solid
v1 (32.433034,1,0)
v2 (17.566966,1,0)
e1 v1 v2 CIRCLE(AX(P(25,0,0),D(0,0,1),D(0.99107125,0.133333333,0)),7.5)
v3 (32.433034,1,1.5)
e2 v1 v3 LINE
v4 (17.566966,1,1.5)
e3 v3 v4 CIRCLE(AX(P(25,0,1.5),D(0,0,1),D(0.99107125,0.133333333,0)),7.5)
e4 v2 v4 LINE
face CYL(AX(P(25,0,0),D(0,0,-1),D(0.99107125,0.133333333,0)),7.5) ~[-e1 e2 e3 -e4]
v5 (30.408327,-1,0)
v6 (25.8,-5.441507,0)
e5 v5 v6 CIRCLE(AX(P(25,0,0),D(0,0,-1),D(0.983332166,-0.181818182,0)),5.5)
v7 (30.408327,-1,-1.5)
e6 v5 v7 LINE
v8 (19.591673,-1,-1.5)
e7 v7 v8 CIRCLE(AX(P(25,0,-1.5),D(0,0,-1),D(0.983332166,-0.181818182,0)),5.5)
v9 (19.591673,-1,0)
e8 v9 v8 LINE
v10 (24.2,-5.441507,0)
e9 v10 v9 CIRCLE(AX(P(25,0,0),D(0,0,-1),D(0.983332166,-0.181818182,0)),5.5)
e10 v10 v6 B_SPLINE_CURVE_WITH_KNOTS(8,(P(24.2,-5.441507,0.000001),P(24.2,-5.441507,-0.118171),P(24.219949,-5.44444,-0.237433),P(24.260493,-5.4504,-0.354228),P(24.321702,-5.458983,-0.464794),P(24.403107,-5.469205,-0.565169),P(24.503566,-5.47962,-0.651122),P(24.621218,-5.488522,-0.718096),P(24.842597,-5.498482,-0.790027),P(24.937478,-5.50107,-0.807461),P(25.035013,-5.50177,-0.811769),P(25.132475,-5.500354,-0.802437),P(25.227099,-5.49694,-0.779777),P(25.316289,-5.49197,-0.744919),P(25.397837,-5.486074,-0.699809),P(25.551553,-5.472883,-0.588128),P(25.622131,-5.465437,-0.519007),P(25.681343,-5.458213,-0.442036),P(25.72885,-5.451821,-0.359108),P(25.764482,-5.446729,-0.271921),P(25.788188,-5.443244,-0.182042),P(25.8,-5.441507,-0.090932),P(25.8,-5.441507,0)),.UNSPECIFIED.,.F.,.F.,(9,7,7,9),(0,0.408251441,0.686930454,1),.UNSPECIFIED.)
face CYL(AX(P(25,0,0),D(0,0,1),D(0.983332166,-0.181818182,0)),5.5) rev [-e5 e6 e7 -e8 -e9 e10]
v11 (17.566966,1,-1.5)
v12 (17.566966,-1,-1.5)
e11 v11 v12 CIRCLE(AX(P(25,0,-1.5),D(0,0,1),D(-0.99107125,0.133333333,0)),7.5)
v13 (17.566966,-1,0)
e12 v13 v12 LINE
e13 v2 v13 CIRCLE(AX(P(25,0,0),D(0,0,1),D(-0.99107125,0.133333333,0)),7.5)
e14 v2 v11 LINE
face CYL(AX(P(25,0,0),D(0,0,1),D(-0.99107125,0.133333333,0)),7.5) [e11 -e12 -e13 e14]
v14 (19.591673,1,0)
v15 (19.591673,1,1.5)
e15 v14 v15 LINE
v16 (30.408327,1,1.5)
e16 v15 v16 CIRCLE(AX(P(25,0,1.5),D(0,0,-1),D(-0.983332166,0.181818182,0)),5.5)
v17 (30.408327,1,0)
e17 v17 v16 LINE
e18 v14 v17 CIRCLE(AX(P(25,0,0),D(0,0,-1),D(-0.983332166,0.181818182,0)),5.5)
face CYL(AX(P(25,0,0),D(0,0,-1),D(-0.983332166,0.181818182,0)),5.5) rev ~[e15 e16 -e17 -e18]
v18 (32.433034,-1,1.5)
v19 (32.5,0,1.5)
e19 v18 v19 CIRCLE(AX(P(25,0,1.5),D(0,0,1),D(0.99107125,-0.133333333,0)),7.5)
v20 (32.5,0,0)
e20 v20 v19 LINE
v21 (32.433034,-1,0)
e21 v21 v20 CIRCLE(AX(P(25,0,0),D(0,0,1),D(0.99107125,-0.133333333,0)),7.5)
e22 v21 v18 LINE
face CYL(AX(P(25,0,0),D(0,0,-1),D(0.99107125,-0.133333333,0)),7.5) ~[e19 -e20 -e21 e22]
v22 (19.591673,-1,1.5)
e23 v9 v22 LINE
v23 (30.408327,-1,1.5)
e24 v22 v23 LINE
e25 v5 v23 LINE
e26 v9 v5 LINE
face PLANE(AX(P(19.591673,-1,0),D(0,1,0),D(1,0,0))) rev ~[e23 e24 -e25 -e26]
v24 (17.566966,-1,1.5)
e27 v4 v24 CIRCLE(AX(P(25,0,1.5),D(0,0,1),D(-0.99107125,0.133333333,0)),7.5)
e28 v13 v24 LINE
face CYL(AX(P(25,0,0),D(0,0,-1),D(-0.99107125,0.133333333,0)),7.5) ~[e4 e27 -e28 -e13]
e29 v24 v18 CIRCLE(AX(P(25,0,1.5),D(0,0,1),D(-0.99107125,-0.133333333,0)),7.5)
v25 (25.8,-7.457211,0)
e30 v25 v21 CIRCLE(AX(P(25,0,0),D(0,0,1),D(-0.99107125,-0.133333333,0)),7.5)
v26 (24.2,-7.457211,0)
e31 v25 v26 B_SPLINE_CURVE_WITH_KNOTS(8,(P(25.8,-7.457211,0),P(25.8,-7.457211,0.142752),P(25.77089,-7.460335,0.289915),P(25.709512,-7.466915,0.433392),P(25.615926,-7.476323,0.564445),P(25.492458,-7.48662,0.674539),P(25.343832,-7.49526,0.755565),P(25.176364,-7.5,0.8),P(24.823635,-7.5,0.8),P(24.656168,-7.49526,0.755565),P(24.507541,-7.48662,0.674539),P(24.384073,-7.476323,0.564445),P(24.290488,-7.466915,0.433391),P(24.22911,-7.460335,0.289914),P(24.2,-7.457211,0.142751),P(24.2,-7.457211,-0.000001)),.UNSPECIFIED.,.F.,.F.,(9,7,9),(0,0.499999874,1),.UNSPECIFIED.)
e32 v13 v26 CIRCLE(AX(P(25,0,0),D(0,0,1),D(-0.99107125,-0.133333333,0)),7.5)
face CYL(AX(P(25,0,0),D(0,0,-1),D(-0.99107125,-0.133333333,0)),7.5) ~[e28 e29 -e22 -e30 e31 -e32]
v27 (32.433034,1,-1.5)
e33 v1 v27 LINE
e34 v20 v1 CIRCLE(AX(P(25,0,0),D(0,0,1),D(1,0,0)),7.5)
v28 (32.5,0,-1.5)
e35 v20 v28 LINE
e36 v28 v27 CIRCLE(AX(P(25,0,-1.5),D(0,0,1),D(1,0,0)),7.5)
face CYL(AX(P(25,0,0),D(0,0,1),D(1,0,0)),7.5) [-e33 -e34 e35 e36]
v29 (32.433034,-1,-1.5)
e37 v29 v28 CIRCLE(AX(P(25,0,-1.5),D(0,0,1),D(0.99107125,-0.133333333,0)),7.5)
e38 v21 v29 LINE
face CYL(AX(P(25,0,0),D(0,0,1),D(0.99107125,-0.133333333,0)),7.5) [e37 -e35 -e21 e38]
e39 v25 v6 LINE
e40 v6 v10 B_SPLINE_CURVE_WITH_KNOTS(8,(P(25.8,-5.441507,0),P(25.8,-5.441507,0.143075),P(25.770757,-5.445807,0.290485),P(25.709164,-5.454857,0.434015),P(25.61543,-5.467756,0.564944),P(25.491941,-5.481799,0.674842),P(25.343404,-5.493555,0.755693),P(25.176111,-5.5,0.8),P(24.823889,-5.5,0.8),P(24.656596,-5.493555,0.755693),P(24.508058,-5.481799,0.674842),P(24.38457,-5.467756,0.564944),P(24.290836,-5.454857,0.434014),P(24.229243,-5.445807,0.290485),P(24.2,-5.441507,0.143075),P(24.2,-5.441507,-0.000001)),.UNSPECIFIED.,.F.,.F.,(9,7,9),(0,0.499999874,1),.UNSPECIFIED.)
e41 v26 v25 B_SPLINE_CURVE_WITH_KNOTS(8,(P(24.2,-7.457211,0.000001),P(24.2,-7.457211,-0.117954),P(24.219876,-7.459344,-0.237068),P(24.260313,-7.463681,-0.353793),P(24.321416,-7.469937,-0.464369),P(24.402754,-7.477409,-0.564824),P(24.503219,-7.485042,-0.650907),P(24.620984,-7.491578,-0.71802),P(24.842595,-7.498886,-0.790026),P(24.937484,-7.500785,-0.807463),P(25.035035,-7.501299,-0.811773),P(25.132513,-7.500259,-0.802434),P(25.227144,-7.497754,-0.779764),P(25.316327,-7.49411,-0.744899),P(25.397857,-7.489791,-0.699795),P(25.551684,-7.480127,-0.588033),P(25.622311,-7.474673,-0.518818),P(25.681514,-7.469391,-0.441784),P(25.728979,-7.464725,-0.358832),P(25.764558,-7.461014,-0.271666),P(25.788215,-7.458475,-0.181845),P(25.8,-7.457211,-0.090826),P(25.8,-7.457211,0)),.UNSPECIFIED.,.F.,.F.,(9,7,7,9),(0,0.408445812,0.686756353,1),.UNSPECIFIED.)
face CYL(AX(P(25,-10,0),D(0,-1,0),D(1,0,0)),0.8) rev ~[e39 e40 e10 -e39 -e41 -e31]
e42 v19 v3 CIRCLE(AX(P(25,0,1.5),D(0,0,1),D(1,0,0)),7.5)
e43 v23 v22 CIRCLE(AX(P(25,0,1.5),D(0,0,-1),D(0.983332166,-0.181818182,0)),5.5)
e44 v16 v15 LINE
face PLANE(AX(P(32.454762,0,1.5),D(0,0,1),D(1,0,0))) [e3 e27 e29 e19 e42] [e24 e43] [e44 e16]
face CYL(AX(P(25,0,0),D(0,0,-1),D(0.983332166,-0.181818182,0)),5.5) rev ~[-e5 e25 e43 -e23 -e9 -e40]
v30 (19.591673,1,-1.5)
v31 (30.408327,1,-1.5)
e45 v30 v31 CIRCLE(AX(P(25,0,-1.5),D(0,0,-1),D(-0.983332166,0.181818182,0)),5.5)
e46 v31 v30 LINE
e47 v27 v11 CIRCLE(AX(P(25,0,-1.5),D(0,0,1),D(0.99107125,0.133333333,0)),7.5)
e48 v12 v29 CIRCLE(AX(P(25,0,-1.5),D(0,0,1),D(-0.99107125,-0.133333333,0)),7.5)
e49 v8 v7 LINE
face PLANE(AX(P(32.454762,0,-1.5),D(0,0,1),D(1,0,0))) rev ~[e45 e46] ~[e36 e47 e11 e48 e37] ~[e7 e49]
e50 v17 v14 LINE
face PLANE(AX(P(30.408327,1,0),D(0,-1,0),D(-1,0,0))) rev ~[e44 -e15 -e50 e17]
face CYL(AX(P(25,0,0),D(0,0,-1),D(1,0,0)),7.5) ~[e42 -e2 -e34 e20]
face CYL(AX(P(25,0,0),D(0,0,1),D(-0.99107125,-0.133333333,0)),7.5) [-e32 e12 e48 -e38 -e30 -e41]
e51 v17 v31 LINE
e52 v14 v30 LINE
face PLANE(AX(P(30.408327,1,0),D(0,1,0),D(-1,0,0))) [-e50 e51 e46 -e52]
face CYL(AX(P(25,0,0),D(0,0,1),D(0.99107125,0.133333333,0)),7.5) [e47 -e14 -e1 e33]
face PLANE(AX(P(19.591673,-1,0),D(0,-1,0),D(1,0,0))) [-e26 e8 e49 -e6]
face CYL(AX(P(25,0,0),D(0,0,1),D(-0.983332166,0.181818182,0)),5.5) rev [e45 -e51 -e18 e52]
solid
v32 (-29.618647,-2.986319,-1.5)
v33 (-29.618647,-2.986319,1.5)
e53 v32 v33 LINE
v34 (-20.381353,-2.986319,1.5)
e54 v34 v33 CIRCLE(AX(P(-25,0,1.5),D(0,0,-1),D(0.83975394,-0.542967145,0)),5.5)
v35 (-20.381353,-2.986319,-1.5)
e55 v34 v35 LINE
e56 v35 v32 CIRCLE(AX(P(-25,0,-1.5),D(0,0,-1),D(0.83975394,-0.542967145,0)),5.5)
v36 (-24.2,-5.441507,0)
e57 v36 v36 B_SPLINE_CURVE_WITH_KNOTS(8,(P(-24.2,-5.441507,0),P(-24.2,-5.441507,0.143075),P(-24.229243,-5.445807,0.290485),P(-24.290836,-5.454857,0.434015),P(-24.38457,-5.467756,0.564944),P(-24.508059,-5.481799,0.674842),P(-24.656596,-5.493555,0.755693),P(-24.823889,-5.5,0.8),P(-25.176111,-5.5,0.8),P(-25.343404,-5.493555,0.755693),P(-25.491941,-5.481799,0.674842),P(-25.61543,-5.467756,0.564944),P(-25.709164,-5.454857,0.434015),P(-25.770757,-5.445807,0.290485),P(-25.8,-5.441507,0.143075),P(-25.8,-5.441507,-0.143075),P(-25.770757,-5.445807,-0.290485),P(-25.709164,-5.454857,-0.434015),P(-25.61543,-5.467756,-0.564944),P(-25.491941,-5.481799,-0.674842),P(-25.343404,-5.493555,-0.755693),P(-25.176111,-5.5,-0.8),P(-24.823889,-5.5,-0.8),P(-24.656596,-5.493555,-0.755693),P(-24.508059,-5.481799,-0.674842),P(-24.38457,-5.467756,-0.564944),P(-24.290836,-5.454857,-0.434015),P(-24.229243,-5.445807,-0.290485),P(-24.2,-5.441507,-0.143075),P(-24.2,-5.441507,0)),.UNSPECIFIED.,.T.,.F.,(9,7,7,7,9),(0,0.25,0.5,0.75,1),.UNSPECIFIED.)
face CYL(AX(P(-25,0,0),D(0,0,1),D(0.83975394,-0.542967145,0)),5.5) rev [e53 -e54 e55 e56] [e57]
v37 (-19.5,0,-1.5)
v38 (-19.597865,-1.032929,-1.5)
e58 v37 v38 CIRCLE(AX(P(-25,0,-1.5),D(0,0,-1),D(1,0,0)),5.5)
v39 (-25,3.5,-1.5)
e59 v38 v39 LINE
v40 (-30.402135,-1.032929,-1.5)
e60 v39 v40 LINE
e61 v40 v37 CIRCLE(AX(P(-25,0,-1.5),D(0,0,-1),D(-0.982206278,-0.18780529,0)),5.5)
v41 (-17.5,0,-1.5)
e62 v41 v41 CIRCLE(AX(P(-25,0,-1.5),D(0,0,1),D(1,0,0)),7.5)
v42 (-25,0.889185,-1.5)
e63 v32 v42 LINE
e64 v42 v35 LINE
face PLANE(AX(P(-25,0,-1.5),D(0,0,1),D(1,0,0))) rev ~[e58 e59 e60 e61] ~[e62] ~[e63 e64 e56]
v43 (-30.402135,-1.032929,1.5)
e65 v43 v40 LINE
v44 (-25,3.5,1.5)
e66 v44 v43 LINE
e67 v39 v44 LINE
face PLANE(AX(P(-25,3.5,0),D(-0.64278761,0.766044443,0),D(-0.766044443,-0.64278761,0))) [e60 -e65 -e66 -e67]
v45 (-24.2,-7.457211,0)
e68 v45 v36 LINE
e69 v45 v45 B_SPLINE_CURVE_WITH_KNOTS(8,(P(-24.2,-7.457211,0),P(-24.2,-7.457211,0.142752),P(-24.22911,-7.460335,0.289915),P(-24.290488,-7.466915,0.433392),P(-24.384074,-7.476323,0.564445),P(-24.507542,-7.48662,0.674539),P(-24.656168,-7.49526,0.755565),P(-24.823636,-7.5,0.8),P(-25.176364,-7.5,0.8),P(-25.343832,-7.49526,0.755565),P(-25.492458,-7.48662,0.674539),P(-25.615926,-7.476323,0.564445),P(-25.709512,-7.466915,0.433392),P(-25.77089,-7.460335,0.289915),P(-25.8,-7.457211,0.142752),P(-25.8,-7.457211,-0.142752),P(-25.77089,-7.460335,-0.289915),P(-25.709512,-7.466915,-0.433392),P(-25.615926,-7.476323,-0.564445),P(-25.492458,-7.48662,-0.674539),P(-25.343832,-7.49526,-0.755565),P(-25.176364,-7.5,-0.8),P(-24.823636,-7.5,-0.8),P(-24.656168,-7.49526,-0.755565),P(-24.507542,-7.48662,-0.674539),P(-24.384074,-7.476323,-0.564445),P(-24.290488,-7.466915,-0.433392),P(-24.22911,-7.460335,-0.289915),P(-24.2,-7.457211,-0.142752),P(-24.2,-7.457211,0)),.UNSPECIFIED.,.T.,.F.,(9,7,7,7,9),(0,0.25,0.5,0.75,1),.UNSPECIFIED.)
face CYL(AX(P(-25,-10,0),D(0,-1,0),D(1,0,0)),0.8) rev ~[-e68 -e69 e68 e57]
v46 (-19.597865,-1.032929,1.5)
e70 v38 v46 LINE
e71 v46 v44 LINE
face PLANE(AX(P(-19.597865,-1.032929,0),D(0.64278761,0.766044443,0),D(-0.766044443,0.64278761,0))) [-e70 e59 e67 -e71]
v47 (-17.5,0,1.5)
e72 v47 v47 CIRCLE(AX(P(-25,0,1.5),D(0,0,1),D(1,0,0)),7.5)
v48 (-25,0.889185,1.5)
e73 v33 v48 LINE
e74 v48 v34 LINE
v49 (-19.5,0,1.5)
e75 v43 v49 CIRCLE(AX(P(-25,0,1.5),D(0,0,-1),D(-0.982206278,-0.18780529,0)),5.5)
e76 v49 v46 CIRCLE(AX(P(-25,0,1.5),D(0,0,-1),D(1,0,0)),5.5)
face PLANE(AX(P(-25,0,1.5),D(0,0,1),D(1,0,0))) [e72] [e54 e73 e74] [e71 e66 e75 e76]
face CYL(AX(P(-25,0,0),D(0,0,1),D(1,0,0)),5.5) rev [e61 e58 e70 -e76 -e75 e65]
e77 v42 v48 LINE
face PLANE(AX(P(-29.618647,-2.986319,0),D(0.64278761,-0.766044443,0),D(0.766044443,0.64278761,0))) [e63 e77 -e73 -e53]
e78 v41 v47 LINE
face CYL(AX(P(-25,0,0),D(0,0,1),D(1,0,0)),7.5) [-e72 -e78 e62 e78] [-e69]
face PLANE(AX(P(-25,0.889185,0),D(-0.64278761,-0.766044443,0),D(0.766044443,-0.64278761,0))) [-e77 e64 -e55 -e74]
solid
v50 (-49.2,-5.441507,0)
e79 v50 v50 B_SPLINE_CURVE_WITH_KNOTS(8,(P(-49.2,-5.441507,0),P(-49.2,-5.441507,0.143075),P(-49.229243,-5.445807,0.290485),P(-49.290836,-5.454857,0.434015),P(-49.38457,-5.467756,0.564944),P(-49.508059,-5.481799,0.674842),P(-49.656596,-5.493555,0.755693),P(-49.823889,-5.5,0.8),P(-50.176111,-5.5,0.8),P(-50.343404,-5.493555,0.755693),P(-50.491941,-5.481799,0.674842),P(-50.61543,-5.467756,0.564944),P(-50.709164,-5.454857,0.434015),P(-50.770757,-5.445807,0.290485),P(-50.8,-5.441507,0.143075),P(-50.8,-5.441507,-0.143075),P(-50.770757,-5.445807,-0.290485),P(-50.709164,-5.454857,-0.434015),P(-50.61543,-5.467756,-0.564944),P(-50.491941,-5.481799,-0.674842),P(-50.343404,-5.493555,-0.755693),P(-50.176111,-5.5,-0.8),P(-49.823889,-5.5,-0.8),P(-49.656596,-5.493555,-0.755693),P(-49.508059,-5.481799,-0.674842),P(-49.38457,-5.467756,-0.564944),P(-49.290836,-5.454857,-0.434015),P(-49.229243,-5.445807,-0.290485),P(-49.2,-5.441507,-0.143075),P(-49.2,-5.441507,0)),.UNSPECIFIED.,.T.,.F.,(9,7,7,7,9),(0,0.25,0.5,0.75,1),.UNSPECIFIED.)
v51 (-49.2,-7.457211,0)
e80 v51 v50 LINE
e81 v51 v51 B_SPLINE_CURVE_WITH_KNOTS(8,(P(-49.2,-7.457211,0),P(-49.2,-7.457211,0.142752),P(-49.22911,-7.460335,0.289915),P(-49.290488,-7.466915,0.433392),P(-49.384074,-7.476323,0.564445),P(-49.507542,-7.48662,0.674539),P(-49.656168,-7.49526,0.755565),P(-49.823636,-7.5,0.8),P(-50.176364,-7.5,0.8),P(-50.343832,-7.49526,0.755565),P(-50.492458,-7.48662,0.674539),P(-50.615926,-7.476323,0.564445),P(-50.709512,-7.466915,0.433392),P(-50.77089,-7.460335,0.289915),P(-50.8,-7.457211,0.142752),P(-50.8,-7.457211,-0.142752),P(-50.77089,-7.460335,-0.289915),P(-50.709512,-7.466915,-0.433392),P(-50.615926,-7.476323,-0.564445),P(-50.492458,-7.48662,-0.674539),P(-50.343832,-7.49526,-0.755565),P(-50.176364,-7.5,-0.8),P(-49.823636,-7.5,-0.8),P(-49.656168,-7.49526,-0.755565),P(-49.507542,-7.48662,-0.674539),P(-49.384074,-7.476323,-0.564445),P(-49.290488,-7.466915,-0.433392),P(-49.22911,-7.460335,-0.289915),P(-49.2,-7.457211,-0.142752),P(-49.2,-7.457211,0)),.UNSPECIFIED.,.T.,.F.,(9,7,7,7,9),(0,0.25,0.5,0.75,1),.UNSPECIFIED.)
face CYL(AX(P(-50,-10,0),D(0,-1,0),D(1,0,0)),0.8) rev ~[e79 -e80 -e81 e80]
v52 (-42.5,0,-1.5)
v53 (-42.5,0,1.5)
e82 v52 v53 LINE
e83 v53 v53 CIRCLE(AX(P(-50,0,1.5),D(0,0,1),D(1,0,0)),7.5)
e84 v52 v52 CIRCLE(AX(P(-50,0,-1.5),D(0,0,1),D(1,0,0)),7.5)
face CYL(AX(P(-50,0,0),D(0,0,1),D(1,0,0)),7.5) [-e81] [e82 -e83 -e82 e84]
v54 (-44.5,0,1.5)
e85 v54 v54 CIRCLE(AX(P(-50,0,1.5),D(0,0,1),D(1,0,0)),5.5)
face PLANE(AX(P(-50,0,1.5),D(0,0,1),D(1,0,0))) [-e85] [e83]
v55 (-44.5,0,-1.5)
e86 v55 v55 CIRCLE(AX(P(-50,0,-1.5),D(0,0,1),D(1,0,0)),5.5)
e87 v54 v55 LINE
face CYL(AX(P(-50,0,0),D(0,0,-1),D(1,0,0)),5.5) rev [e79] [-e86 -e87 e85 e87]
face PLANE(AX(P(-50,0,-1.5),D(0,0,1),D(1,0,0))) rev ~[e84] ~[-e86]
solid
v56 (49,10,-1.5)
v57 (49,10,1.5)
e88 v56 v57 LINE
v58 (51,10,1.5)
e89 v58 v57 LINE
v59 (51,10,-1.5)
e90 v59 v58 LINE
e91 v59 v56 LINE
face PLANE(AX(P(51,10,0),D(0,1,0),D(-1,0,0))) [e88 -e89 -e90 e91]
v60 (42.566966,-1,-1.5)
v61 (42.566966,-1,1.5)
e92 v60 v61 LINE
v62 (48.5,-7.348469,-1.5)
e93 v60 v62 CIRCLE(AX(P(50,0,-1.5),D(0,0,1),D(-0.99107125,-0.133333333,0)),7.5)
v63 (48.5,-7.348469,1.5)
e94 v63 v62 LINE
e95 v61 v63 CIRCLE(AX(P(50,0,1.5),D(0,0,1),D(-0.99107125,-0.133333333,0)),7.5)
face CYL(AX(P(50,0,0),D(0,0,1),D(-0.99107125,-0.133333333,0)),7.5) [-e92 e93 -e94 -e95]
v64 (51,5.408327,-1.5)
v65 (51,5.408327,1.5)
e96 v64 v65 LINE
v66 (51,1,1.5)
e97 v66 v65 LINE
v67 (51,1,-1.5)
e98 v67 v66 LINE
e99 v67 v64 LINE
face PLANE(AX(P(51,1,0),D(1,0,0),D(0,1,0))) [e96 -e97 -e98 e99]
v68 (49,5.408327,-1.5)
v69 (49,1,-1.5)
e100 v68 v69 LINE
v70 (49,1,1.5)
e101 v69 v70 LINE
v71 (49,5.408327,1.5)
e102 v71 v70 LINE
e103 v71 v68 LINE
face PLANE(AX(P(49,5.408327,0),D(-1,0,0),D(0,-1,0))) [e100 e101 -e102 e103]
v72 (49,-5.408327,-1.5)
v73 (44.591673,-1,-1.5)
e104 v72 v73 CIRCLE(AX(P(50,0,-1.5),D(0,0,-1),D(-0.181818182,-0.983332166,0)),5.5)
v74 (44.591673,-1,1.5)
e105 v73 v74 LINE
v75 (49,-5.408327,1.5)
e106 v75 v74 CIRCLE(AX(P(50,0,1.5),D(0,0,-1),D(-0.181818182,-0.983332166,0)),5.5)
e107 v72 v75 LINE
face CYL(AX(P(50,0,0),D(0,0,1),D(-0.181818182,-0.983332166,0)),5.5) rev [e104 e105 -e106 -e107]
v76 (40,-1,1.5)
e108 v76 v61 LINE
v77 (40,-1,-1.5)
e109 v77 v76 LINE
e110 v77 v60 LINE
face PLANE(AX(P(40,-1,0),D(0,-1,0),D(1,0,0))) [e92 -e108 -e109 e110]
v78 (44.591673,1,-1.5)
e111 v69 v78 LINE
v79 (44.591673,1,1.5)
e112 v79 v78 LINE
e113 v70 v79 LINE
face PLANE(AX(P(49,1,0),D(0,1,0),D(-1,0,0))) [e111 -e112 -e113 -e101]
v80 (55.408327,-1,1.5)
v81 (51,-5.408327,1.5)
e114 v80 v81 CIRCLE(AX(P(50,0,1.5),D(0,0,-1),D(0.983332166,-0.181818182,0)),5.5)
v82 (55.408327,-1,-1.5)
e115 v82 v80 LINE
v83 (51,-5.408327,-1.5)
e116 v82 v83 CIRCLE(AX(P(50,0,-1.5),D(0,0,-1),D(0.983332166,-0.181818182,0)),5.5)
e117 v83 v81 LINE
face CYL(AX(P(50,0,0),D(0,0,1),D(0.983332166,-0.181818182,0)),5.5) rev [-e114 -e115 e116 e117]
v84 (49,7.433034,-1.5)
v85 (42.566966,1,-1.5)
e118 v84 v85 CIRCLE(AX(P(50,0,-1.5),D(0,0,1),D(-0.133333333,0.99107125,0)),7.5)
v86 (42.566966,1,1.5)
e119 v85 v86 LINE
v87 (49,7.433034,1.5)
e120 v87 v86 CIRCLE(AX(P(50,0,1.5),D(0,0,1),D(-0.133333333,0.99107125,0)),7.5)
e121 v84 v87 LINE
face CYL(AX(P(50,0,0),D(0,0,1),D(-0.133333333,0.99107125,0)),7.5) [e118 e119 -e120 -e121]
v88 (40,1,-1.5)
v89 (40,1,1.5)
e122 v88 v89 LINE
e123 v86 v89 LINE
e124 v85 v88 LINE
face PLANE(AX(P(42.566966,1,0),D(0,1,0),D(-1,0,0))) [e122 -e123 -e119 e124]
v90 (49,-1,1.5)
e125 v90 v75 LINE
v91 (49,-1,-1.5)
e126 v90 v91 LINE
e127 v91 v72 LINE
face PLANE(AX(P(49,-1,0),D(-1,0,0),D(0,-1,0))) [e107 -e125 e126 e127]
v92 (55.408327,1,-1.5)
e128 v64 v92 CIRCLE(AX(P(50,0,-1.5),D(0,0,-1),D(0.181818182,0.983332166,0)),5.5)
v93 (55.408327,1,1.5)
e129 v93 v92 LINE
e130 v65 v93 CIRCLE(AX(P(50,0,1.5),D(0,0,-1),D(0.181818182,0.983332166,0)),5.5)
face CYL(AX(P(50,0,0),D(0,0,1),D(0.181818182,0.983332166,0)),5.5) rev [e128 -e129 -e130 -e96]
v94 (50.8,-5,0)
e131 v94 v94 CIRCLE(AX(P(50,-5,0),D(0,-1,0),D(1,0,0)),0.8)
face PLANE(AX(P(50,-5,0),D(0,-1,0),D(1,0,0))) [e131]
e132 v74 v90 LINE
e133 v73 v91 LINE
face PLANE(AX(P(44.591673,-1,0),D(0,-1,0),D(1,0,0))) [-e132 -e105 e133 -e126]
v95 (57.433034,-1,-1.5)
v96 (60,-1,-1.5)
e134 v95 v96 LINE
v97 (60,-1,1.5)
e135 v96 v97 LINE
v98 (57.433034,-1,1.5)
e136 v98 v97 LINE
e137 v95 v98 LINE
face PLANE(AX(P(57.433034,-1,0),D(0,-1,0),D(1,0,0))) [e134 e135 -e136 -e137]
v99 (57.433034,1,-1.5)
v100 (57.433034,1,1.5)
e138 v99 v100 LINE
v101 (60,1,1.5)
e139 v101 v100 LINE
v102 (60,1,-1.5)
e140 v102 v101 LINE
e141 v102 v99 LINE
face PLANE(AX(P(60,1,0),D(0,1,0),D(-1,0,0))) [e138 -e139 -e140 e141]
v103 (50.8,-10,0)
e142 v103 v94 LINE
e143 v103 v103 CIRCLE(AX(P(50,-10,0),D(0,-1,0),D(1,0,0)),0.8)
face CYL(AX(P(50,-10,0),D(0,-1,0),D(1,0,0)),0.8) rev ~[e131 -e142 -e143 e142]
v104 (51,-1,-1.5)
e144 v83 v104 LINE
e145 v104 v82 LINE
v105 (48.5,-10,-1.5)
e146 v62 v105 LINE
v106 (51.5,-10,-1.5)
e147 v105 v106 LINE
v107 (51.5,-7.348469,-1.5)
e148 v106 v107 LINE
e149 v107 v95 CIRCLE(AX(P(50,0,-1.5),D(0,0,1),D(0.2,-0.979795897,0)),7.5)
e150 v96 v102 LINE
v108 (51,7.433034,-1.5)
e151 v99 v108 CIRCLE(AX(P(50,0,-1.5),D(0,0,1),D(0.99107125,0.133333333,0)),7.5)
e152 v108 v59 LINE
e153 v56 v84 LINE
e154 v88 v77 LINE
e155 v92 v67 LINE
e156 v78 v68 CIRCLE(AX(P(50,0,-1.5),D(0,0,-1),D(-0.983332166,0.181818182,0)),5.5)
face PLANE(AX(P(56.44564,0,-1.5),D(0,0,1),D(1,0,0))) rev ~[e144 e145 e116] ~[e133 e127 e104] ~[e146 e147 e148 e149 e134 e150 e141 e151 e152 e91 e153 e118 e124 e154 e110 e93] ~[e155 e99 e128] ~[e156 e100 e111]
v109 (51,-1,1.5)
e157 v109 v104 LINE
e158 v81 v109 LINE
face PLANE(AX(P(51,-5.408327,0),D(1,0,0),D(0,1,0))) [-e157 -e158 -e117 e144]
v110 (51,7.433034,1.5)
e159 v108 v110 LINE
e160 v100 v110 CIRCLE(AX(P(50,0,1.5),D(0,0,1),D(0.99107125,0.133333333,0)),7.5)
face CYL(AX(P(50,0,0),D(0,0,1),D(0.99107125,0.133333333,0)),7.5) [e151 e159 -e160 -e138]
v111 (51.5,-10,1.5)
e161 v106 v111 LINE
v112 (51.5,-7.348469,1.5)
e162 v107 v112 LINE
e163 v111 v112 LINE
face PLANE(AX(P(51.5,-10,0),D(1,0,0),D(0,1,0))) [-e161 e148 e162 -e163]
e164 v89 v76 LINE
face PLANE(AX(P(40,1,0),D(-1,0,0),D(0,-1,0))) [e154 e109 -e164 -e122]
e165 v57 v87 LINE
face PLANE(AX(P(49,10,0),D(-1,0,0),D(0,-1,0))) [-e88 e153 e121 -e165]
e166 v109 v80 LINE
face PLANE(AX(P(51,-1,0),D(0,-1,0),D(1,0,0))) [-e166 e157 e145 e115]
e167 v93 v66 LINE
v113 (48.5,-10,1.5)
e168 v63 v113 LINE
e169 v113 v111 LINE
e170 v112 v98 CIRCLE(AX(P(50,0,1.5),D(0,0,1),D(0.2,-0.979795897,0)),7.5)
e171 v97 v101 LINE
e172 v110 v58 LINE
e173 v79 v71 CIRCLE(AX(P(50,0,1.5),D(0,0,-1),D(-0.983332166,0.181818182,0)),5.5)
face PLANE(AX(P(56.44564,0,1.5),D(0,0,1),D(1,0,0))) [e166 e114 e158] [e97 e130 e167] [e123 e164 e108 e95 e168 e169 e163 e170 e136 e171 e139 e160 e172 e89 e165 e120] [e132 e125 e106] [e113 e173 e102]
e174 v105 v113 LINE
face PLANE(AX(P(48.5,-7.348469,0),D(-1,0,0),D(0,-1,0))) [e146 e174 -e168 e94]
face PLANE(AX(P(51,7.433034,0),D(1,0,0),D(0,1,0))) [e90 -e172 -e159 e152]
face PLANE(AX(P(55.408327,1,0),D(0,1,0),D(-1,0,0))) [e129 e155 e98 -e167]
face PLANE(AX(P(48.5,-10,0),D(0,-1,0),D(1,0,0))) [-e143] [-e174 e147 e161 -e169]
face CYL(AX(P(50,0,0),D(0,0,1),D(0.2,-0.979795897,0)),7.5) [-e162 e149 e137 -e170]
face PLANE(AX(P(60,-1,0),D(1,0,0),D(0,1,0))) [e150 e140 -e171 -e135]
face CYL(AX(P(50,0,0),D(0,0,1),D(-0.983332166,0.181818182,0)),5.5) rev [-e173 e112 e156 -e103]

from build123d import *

# Parameters (mm, degrees)
F0_W     = 2
F0_H     = 2
F1_DEPTH = 1.5
F0_R     = 7.5
F0_R_2   = 5.5
F2_R     = 0.8
F3_DEPTH = 5


with BuildPart() as f1:
    # F0 (on Top) → F1 (new body, symmetric)
    with BuildSketch(Plane.XY):
        with BuildLine():
            ThreePointArc((57.4330343737, -1), (57.4832398666, -0.5011198447), (57.5, 0))
            ThreePointArc((57.5, 0), (57.4832398666, 0.5011198447), (57.4330343737, 1))
            Line((57.4330343737, 1), (55.4083269132, 1))
            ThreePointArc((55.4083269132, 1), (55.4770337785, 0.502096593), (55.5, 0))
            ThreePointArc((55.5, 0), (55.4770337785, -0.502096593), (55.4083269132, -1))
            Line((55.4083269132, -1), (57.4330343737, -1))
        make_face()
        with BuildLine():
            ThreePointArc((57.4330343737, 1), (57.4832398666, 0.5011198447), (57.5, 0))
            ThreePointArc((57.5, 0), (57.4832398666, -0.5011198447), (57.4330343737, -1))
            Line((57.4330343737, -1), (60, -1))
            Line((60, -1), (60, 1))
            Line((60, 1), (57.4330343737, 1))
        make_face()
        with BuildLine():
            Line((55.4083269132, 1), (57.4330343737, 1))
            ThreePointArc((57.4330343737, 1), (55.3033008589, 5.3033008589), (51, 7.4330343737))
            Line((51, 7.4330343737), (51, 5.4083269132))
            ThreePointArc((51, 5.4083269132), (53.8890872965, 3.8890872965), (55.4083269132, 1))
        make_face()
        with BuildLine():
            ThreePointArc((51.5, -7.3484692283), (55.4795566578, -5.1209822138), (57.4330343737, -1))
            Line((57.4330343737, -1), (55.4083269132, -1))
            ThreePointArc((55.4083269132, -1), (53.8890872965, -3.8890872965), (51, -5.4083269132))
            Line((51, -5.4083269132), (51, -7.3484692283))
            Line((51, -7.3484692283), (51.5, -7.3484692283))
        make_face()
        with BuildLine():
            Line((51, 5.4083269132), (51, 7.4330343737))
            ThreePointArc((51, 7.4330343737), (50, 7.5), (49, 7.4330343737))
            Line((49, 7.4330343737), (49, 5.4083269132))
            ThreePointArc((49, 5.4083269132), (50, 5.5), (51, 5.4083269132))
        make_face()
        with BuildLine():
            ThreePointArc((49, 7.4330343737), (50, 7.5), (51, 7.4330343737))
            Line((51, 7.4330343737), (51, 10))
            Line((51, 10), (49, 10))
            Line((49, 10), (49, 7.4330343737))
        make_face()
        with BuildLine():
            ThreePointArc((55.5, 0), (55.4770337785, 0.502096593), (55.4083269132, 1))
            Line((55.4083269132, 1), (51, 1))
            Line((51, 1), (51, -1))
            Line((51, -1), (55.4083269132, -1))
            ThreePointArc((55.4083269132, -1), (55.4770337785, -0.502096593), (55.5, 0))
        make_face()
        with BuildLine():
            Line((51.5, -10), (51.5, -7.3484692283))
            ThreePointArc((51.5, -7.3484692283), (51.2507149219, -7.3949788495), (51, -7.4330343737))
            Line((51, -7.4330343737), (51, -10))
            Line((51, -10), (51.5, -10))
        make_face()
        with BuildLine():
            ThreePointArc((51, -7.4330343737), (51.2507149219, -7.3949788495), (51.5, -7.3484692283))
            Line((51.5, -7.3484692283), (51, -7.3484692283))
            Line((51, -7.3484692283), (51, -7.4330343737))
        make_face()
        with BuildLine():
            Line((49, 5.4083269132), (49, 7.4330343737))
            ThreePointArc((49, 7.4330343737), (44.6966991411, 5.3033008589), (42.5669656263, 1))
            Line((42.5669656263, 1), (44.5916730868, 1))
            ThreePointArc((44.5916730868, 1), (46.1109127035, 3.8890872965), (49, 5.4083269132))
        make_face()
        with BuildLine():
            Line((51, 1), (51, 5.4083269132))
            ThreePointArc((51, 5.4083269132), (50, 5.5), (49, 5.4083269132))
            Line((49, 5.4083269132), (49, 1))
            Line((49, 1), (51, 1))
        make_face()
        with Locations((50, 0)):
            Rectangle(F0_W, F0_H)
        with BuildLine():
            Line((51, -10), (51, -7.4330343737))
            ThreePointArc((51, -7.4330343737), (50, -7.5), (49, -7.4330343737))
            Line((49, -7.4330343737), (49, -10))
            Line((49, -10), (51, -10))
        make_face()
        with BuildLine():
            ThreePointArc((49, -7.4330343737), (50, -7.5), (51, -7.4330343737))
            Line((51, -7.4330343737), (51, -7.3484692283))
            Line((51, -7.3484692283), (49, -7.3484692283))
            Line((49, -7.3484692283), (49, -7.4330343737))
        make_face()
        with BuildLine():
            Line((49, -7.3484692283), (51, -7.3484692283))
            Line((51, -7.3484692283), (51, -5.4083269132))
            ThreePointArc((51, -5.4083269132), (50, -5.5), (49, -5.4083269132))
            Line((49, -5.4083269132), (49, -7.3484692283))
        make_face()
        with BuildLine():
            ThreePointArc((49, -5.4083269132), (50, -5.5), (51, -5.4083269132))
            Line((51, -5.4083269132), (51, -1))
            Line((51, -1), (49, -1))
            Line((49, -1), (49, -5.4083269132))
        make_face()
        with BuildLine():
            Line((44.5916730868, 1), (42.5669656263, 1))
            ThreePointArc((42.5669656263, 1), (42.5, 0), (42.5669656263, -1))
            Line((42.5669656263, -1), (44.5916730868, -1))
            ThreePointArc((44.5916730868, -1), (44.5, 0), (44.5916730868, 1))
        make_face()
        with BuildLine():
            ThreePointArc((42.5669656263, -1), (42.5, 0), (42.5669656263, 1))
            Line((42.5669656263, 1), (40, 1))
            Line((40, 1), (40, -1))
            Line((40, -1), (42.5669656263, -1))
        make_face()
        with BuildLine():
            Line((49, -1), (49, 1))
            Line((49, 1), (44.5916730868, 1))
            ThreePointArc((44.5916730868, 1), (44.5, 0), (44.5916730868, -1))
            Line((44.5916730868, -1), (49, -1))
        make_face()
        with BuildLine():
            Line((49, -10), (49, -7.4330343737))
            ThreePointArc((49, -7.4330343737), (48.7492850781, -7.3949788495), (48.5, -7.3484692283))
            Line((48.5, -7.3484692283), (48.5, -10))
            Line((48.5, -10), (49, -10))
        make_face()
        with BuildLine():
            ThreePointArc((48.5, -7.3484692283), (48.7492850781, -7.3949788495), (49, -7.4330343737))
            Line((49, -7.4330343737), (49, -7.3484692283))
            Line((49, -7.3484692283), (48.5, -7.3484692283))
        make_face()
        with BuildLine():
            Line((48.5, -7.3484692283), (49, -7.3484692283))
            Line((49, -7.3484692283), (49, -5.4083269132))
            ThreePointArc((49, -5.4083269132), (46.1109127035, -3.8890872965), (44.5916730868, -1))
            Line((44.5916730868, -1), (42.5669656263, -1))
            ThreePointArc((42.5669656263, -1), (44.5204433422, -5.1209822138), (48.5, -7.3484692283))
        make_face()
    extrude(amount=F1_DEPTH, both=True)


with BuildPart() as f1b:
    # F0 (on Top) → F1, piece 2 (new body, symmetric)
    with BuildSketch(Plane.XY):
        with BuildLine():
            ThreePointArc((32.4330343737, -1), (32.4832398666, -0.5011198447), (32.5, 0))
            ThreePointArc((32.5, 0), (32.4832398666, 0.5011198447), (32.4330343737, 1))
            Line((32.4330343737, 1), (32.4330343737, -1))
        make_face()
        with BuildLine():
            Line((30.4083269132, 1), (32.4330343737, 1))
            ThreePointArc((32.4330343737, 1), (25, 7.5), (17.5669656263, 1))
            Line((17.5669656263, 1), (19.5916730868, 1))
            ThreePointArc((19.5916730868, 1), (25, 5.5), (30.4083269132, 1))
        make_face()
        with BuildLine():
            Line((32.4330343737, -1), (32.4330343737, 1))
            Line((32.4330343737, 1), (30.4083269132, 1))
            ThreePointArc((30.4083269132, 1), (30.4770337785, 0.502096593), (30.5, 0))
            ThreePointArc((30.5, 0), (30.4770337785, -0.502096593), (30.4083269132, -1))
            Line((30.4083269132, -1), (32.4330343737, -1))
        make_face()
        with BuildLine():
            ThreePointArc((17.5669656263, -1), (25, -7.5), (32.4330343737, -1))
            Line((32.4330343737, -1), (30.4083269132, -1))
            ThreePointArc((30.4083269132, -1), (25, -5.5), (19.5916730868, -1))
            Line((19.5916730868, -1), (17.5669656263, -1))
        make_face()
        with BuildLine():
            Line((17.5669656263, -1), (17.5669656263, 1))
            ThreePointArc((17.5669656263, 1), (17.5, 0), (17.5669656263, -1))
        make_face()
        with BuildLine():
            Line((19.5916730868, 1), (17.5669656263, 1))
            Line((17.5669656263, 1), (17.5669656263, -1))
            Line((17.5669656263, -1), (19.5916730868, -1))
            ThreePointArc((19.5916730868, -1), (19.5, 0), (19.5916730868, 1))
        make_face()
        with BuildLine():
            ThreePointArc((30.5, 0), (30.4770337785, 0.502096593), (30.4083269132, 1))
            Line((30.4083269132, 1), (19.5916730868, 1))
            ThreePointArc((19.5916730868, 1), (19.5, 0), (19.5916730868, -1))
            Line((19.5916730868, -1), (30.4083269132, -1))
            ThreePointArc((30.4083269132, -1), (30.4770337785, -0.502096593), (30.5, 0))
        make_face()
    extrude(amount=F1_DEPTH, both=True)


with BuildPart() as f1c:
    # F0 (on Top) → F1, piece 3 (new body, symmetric)
    with BuildSketch(Plane.XY):
        with Locations((-25, 0)):
            Circle(F0_R)
        with BuildLine():
            ThreePointArc((-30.4021345309, -1.0329290925), (-25.5187774475, 5.4754789708), (-19.5, 0))
            ThreePointArc((-19.5, 0), (-19.5245210292, -0.5187774475), (-19.5978654691, -1.0329290925))
            ThreePointArc((-19.5978654691, -1.0329290925), (-19.8953014496, -2.0474502947), (-20.38135333, -2.986319296))
            ThreePointArc((-20.38135333, -2.986319296), (-25, -5.5), (-29.61864667, -2.986319296))
            ThreePointArc((-29.61864667, -2.986319296), (-30.1046985504, -2.0474502947), (-30.4021345309, -1.0329290925))
        make_face(mode=Mode.SUBTRACT)
        with BuildLine():
            Line((-25, 3.5), (-30.4021345309, -1.0329290925))
            ThreePointArc((-30.4021345309, -1.0329290925), (-30.1046985504, -2.0474502947), (-29.61864667, -2.986319296))
            Line((-29.61864667, -2.986319296), (-25, 0.8891854213))
            Line((-25, 0.8891854213), (-20.38135333, -2.986319296))
            ThreePointArc((-20.38135333, -2.986319296), (-19.8953014496, -2.0474502947), (-19.5978654691, -1.0329290925))
            Line((-19.5978654691, -1.0329290925), (-25, 3.5))
        make_face()
    extrude(amount=F1_DEPTH, both=True)


with BuildPart() as f1d:
    # F0 (on Top) → F1, piece 4 (new body, symmetric)
    with BuildSketch(Plane.XY):
        with Locations((-50, 0)):
            Circle(F0_R)
        with Locations((-50, 0)):
            Circle(F0_R_2, mode=Mode.SUBTRACT)
    extrude(amount=F1_DEPTH, both=True)


with BuildPart() as f3_tool:
    # F2 (on face) → F3 (new body)
    with BuildSketch(Plane.XZ.offset(10)):
        with Locations((50, 0)):
            Circle(F2_R)
        with Locations((25, 0)):
            Circle(F2_R)
        with Locations((-25, 0)):
            Circle(F2_R)
        with Locations((-50, 0)):
            Circle(F2_R)
    extrude(amount=-F3_DEPTH)


with BuildPart() as f1_1:
    add(f1.part)

    # F3: cut by f3_tool
    add(f3_tool.part, mode=Mode.SUBTRACT)


with BuildPart() as f1b_1:
    add(f1b.part)

    # F3: cut by f3_tool
    add(f3_tool.part, mode=Mode.SUBTRACT)


with BuildPart() as f1c_1:
    add(f1c.part)

    # F3: cut by f3_tool
    add(f3_tool.part, mode=Mode.SUBTRACT)


with BuildPart() as f1d_1:
    add(f1d.part)

    # F3: cut by f3_tool
    add(f3_tool.part, mode=Mode.SUBTRACT)


solid = Compound([f1_1.part, f1b_1.part, f1c_1.part, f1d_1.part])
